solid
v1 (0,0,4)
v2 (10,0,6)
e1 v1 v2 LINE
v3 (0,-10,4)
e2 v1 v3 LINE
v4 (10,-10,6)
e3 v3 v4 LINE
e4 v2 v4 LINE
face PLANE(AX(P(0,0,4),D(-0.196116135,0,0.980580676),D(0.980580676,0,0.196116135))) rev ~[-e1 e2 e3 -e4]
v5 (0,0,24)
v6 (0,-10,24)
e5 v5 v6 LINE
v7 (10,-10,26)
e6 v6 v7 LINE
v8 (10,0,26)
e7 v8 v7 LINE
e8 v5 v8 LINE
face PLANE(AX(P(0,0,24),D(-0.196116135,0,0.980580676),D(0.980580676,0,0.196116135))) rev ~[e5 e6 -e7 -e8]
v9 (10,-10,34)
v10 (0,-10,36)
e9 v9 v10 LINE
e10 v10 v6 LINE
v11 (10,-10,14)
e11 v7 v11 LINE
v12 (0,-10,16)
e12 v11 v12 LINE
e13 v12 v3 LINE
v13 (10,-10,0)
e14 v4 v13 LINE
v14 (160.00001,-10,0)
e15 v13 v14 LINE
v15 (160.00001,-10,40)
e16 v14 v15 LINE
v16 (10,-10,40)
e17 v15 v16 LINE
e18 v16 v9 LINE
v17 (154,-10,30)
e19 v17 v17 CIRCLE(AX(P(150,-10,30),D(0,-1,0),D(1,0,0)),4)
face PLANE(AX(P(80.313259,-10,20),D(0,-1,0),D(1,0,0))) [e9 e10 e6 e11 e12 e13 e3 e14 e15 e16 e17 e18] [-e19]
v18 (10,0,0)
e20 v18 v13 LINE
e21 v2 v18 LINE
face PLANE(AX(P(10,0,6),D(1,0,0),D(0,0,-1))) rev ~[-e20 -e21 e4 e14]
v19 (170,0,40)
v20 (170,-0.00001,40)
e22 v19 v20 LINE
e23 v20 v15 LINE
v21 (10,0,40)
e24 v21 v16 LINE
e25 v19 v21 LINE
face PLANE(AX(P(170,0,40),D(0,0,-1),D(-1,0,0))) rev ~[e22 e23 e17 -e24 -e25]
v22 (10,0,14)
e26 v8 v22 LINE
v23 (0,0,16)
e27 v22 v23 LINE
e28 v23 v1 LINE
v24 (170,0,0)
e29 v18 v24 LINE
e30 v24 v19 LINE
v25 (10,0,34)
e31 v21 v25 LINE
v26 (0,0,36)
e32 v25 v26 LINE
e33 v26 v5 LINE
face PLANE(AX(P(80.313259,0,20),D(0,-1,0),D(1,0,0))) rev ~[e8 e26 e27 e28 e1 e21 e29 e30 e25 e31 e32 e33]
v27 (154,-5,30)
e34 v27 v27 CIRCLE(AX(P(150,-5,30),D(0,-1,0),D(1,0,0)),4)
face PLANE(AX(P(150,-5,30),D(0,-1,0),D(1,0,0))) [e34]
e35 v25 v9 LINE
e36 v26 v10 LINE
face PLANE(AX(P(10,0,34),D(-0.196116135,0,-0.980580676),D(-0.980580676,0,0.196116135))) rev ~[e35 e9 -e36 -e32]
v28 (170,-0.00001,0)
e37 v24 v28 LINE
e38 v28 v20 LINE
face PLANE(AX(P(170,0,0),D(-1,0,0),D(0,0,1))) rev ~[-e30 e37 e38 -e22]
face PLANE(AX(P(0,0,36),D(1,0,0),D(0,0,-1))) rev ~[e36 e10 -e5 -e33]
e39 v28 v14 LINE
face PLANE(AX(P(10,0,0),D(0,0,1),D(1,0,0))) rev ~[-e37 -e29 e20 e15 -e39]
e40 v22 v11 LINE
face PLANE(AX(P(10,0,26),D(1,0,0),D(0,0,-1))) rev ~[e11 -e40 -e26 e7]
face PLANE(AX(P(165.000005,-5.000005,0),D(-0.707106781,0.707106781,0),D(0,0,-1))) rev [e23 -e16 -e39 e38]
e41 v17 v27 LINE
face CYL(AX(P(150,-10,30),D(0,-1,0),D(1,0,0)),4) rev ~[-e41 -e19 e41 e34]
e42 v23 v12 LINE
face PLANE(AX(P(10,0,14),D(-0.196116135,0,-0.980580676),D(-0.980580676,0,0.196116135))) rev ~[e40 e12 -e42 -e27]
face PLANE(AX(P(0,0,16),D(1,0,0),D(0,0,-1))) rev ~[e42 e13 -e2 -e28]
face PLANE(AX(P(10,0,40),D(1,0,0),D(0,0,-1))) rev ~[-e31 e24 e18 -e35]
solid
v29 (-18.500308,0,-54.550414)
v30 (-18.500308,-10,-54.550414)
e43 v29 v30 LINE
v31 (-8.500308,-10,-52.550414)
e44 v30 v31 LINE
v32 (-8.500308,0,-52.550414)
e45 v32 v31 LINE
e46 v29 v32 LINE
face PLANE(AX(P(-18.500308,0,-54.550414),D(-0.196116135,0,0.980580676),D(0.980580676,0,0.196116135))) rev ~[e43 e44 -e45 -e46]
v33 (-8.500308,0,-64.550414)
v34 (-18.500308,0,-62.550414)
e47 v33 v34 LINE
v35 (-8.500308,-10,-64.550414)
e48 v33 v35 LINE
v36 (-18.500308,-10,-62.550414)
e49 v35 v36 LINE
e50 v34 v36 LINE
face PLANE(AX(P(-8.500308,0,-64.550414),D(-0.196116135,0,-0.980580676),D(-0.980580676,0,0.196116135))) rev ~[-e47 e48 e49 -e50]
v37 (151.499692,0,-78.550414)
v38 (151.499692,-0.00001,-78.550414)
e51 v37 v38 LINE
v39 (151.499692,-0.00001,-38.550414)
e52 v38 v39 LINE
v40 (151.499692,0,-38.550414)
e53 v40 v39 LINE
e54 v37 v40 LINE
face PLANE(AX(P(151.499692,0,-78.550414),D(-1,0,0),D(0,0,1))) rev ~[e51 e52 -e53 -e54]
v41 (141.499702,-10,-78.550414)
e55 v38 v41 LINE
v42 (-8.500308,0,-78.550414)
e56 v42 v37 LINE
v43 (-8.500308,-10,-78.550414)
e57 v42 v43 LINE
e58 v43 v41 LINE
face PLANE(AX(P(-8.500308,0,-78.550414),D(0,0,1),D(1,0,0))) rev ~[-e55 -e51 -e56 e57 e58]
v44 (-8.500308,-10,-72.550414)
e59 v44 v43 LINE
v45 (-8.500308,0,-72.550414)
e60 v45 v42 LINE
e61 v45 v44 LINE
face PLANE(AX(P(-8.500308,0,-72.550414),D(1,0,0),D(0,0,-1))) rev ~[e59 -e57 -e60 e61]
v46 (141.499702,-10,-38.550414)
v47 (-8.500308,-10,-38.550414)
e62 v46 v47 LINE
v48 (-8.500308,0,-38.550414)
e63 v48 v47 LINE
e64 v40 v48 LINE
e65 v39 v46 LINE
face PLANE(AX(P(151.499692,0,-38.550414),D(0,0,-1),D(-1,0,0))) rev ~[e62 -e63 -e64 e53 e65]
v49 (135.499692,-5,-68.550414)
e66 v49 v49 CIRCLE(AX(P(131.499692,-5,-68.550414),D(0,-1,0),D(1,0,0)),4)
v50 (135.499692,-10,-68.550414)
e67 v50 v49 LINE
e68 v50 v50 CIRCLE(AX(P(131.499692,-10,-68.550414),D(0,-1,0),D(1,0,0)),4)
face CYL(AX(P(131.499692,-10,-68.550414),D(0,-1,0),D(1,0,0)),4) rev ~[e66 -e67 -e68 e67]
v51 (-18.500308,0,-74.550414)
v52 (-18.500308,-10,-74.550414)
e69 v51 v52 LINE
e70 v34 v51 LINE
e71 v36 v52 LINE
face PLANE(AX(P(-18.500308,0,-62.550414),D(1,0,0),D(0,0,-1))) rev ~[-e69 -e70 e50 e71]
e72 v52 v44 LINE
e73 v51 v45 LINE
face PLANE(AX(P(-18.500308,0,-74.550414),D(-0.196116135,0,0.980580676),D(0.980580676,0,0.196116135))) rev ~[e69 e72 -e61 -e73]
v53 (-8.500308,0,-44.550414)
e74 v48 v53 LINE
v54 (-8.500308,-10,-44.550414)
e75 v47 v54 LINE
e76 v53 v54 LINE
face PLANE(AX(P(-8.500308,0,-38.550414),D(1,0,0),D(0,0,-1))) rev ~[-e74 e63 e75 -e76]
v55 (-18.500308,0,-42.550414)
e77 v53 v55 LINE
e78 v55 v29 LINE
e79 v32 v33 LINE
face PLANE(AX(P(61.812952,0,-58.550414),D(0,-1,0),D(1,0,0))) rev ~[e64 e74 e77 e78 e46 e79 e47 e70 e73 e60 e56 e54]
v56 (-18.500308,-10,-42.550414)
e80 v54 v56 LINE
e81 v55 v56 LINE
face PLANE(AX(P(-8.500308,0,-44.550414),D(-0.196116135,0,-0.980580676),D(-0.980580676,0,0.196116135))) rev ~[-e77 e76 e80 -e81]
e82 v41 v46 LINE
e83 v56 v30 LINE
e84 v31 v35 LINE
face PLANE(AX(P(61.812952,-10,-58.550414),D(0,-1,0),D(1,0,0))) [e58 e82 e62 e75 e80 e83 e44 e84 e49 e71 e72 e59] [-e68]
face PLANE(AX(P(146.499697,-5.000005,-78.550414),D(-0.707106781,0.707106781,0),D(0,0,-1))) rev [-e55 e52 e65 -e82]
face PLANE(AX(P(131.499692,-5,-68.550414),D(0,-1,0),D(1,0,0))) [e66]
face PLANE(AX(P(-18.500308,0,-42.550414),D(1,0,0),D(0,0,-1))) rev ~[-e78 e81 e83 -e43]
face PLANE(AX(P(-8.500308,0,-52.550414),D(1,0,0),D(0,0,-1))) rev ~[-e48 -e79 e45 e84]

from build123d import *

# Parameters (mm, degrees)
F1_DEPTH = 10
F2_SIZE  = 9.99999
F3_SIZE  = 9.99999
F4_R     = 4
F5_DEPTH = 5
F6_R     = 4
F7_DEPTH = 5


# Not quite as in the source:
# - a fillet or chamfer is up to 0.001 mm smaller than in the source, because OpenCascade refuses the exact size


with BuildPart() as f1:
    # F0 (on Front) → F1 (new body)
    with BuildSketch(Plane.XZ):
        Polygon((10, 6), (10, 0), (170, 0), (170, 40), (10, 40), (10, 34), (0, 36), (0, 24), (10, 26), (10, 14), (0, 16), (0, 4), align=None)
    extrude(amount=F1_DEPTH)

    # F2 (size 10 in the source; OpenCascade refuses exactly that, so slightly less here)
    f2_edges = [f1.edges().sort_by_distance(p)[0] for p in [
        (170, -10, 20),
    ]]
    chamfer(f2_edges, length=F2_SIZE)

    # F4 (on face) → F5 (cut)
    with BuildSketch(Plane.XZ.offset(10)):
        with Locations((150, 30)):
            Circle(F4_R)
    extrude(amount=-F5_DEPTH, mode=Mode.SUBTRACT)


with BuildPart() as f1b:
    # F0 (on Front) → F1, piece 2 (new body)
    with BuildSketch(Plane.XZ):
        Polygon((-8.5003077292, -72.550413698), (-8.5003077292, -78.550413698), (151.4996922708, -78.550413698), (151.4996922708, -38.550413698), (-8.5003077292, -38.550413698), (-8.5003077292, -44.550413698), (-18.5003077292, -42.550413698), (-18.5003077292, -54.550413698), (-8.5003077292, -52.550413698), (-8.5003077292, -64.550413698), (-18.5003077292, -62.550413698), (-18.5003077292, -74.550413698), align=None)
    extrude(amount=F1_DEPTH)

    # F3 (size 10 in the source; OpenCascade refuses exactly that, so slightly less here)
    f3_edges = [f1b.edges().sort_by_distance(p)[0] for p in [
        (151.499692, -10, -58.550414),
    ]]
    chamfer(f3_edges, length=F3_SIZE)

    # F6 (on face) → F7 (cut)
    with BuildSketch(Plane.XZ.offset(10)):
        with Locations((131.4996922708, -68.550413698)):
            Circle(F6_R)
    extrude(amount=-F7_DEPTH, mode=Mode.SUBTRACT)


solid = Compound([f1.part, f1b.part])
